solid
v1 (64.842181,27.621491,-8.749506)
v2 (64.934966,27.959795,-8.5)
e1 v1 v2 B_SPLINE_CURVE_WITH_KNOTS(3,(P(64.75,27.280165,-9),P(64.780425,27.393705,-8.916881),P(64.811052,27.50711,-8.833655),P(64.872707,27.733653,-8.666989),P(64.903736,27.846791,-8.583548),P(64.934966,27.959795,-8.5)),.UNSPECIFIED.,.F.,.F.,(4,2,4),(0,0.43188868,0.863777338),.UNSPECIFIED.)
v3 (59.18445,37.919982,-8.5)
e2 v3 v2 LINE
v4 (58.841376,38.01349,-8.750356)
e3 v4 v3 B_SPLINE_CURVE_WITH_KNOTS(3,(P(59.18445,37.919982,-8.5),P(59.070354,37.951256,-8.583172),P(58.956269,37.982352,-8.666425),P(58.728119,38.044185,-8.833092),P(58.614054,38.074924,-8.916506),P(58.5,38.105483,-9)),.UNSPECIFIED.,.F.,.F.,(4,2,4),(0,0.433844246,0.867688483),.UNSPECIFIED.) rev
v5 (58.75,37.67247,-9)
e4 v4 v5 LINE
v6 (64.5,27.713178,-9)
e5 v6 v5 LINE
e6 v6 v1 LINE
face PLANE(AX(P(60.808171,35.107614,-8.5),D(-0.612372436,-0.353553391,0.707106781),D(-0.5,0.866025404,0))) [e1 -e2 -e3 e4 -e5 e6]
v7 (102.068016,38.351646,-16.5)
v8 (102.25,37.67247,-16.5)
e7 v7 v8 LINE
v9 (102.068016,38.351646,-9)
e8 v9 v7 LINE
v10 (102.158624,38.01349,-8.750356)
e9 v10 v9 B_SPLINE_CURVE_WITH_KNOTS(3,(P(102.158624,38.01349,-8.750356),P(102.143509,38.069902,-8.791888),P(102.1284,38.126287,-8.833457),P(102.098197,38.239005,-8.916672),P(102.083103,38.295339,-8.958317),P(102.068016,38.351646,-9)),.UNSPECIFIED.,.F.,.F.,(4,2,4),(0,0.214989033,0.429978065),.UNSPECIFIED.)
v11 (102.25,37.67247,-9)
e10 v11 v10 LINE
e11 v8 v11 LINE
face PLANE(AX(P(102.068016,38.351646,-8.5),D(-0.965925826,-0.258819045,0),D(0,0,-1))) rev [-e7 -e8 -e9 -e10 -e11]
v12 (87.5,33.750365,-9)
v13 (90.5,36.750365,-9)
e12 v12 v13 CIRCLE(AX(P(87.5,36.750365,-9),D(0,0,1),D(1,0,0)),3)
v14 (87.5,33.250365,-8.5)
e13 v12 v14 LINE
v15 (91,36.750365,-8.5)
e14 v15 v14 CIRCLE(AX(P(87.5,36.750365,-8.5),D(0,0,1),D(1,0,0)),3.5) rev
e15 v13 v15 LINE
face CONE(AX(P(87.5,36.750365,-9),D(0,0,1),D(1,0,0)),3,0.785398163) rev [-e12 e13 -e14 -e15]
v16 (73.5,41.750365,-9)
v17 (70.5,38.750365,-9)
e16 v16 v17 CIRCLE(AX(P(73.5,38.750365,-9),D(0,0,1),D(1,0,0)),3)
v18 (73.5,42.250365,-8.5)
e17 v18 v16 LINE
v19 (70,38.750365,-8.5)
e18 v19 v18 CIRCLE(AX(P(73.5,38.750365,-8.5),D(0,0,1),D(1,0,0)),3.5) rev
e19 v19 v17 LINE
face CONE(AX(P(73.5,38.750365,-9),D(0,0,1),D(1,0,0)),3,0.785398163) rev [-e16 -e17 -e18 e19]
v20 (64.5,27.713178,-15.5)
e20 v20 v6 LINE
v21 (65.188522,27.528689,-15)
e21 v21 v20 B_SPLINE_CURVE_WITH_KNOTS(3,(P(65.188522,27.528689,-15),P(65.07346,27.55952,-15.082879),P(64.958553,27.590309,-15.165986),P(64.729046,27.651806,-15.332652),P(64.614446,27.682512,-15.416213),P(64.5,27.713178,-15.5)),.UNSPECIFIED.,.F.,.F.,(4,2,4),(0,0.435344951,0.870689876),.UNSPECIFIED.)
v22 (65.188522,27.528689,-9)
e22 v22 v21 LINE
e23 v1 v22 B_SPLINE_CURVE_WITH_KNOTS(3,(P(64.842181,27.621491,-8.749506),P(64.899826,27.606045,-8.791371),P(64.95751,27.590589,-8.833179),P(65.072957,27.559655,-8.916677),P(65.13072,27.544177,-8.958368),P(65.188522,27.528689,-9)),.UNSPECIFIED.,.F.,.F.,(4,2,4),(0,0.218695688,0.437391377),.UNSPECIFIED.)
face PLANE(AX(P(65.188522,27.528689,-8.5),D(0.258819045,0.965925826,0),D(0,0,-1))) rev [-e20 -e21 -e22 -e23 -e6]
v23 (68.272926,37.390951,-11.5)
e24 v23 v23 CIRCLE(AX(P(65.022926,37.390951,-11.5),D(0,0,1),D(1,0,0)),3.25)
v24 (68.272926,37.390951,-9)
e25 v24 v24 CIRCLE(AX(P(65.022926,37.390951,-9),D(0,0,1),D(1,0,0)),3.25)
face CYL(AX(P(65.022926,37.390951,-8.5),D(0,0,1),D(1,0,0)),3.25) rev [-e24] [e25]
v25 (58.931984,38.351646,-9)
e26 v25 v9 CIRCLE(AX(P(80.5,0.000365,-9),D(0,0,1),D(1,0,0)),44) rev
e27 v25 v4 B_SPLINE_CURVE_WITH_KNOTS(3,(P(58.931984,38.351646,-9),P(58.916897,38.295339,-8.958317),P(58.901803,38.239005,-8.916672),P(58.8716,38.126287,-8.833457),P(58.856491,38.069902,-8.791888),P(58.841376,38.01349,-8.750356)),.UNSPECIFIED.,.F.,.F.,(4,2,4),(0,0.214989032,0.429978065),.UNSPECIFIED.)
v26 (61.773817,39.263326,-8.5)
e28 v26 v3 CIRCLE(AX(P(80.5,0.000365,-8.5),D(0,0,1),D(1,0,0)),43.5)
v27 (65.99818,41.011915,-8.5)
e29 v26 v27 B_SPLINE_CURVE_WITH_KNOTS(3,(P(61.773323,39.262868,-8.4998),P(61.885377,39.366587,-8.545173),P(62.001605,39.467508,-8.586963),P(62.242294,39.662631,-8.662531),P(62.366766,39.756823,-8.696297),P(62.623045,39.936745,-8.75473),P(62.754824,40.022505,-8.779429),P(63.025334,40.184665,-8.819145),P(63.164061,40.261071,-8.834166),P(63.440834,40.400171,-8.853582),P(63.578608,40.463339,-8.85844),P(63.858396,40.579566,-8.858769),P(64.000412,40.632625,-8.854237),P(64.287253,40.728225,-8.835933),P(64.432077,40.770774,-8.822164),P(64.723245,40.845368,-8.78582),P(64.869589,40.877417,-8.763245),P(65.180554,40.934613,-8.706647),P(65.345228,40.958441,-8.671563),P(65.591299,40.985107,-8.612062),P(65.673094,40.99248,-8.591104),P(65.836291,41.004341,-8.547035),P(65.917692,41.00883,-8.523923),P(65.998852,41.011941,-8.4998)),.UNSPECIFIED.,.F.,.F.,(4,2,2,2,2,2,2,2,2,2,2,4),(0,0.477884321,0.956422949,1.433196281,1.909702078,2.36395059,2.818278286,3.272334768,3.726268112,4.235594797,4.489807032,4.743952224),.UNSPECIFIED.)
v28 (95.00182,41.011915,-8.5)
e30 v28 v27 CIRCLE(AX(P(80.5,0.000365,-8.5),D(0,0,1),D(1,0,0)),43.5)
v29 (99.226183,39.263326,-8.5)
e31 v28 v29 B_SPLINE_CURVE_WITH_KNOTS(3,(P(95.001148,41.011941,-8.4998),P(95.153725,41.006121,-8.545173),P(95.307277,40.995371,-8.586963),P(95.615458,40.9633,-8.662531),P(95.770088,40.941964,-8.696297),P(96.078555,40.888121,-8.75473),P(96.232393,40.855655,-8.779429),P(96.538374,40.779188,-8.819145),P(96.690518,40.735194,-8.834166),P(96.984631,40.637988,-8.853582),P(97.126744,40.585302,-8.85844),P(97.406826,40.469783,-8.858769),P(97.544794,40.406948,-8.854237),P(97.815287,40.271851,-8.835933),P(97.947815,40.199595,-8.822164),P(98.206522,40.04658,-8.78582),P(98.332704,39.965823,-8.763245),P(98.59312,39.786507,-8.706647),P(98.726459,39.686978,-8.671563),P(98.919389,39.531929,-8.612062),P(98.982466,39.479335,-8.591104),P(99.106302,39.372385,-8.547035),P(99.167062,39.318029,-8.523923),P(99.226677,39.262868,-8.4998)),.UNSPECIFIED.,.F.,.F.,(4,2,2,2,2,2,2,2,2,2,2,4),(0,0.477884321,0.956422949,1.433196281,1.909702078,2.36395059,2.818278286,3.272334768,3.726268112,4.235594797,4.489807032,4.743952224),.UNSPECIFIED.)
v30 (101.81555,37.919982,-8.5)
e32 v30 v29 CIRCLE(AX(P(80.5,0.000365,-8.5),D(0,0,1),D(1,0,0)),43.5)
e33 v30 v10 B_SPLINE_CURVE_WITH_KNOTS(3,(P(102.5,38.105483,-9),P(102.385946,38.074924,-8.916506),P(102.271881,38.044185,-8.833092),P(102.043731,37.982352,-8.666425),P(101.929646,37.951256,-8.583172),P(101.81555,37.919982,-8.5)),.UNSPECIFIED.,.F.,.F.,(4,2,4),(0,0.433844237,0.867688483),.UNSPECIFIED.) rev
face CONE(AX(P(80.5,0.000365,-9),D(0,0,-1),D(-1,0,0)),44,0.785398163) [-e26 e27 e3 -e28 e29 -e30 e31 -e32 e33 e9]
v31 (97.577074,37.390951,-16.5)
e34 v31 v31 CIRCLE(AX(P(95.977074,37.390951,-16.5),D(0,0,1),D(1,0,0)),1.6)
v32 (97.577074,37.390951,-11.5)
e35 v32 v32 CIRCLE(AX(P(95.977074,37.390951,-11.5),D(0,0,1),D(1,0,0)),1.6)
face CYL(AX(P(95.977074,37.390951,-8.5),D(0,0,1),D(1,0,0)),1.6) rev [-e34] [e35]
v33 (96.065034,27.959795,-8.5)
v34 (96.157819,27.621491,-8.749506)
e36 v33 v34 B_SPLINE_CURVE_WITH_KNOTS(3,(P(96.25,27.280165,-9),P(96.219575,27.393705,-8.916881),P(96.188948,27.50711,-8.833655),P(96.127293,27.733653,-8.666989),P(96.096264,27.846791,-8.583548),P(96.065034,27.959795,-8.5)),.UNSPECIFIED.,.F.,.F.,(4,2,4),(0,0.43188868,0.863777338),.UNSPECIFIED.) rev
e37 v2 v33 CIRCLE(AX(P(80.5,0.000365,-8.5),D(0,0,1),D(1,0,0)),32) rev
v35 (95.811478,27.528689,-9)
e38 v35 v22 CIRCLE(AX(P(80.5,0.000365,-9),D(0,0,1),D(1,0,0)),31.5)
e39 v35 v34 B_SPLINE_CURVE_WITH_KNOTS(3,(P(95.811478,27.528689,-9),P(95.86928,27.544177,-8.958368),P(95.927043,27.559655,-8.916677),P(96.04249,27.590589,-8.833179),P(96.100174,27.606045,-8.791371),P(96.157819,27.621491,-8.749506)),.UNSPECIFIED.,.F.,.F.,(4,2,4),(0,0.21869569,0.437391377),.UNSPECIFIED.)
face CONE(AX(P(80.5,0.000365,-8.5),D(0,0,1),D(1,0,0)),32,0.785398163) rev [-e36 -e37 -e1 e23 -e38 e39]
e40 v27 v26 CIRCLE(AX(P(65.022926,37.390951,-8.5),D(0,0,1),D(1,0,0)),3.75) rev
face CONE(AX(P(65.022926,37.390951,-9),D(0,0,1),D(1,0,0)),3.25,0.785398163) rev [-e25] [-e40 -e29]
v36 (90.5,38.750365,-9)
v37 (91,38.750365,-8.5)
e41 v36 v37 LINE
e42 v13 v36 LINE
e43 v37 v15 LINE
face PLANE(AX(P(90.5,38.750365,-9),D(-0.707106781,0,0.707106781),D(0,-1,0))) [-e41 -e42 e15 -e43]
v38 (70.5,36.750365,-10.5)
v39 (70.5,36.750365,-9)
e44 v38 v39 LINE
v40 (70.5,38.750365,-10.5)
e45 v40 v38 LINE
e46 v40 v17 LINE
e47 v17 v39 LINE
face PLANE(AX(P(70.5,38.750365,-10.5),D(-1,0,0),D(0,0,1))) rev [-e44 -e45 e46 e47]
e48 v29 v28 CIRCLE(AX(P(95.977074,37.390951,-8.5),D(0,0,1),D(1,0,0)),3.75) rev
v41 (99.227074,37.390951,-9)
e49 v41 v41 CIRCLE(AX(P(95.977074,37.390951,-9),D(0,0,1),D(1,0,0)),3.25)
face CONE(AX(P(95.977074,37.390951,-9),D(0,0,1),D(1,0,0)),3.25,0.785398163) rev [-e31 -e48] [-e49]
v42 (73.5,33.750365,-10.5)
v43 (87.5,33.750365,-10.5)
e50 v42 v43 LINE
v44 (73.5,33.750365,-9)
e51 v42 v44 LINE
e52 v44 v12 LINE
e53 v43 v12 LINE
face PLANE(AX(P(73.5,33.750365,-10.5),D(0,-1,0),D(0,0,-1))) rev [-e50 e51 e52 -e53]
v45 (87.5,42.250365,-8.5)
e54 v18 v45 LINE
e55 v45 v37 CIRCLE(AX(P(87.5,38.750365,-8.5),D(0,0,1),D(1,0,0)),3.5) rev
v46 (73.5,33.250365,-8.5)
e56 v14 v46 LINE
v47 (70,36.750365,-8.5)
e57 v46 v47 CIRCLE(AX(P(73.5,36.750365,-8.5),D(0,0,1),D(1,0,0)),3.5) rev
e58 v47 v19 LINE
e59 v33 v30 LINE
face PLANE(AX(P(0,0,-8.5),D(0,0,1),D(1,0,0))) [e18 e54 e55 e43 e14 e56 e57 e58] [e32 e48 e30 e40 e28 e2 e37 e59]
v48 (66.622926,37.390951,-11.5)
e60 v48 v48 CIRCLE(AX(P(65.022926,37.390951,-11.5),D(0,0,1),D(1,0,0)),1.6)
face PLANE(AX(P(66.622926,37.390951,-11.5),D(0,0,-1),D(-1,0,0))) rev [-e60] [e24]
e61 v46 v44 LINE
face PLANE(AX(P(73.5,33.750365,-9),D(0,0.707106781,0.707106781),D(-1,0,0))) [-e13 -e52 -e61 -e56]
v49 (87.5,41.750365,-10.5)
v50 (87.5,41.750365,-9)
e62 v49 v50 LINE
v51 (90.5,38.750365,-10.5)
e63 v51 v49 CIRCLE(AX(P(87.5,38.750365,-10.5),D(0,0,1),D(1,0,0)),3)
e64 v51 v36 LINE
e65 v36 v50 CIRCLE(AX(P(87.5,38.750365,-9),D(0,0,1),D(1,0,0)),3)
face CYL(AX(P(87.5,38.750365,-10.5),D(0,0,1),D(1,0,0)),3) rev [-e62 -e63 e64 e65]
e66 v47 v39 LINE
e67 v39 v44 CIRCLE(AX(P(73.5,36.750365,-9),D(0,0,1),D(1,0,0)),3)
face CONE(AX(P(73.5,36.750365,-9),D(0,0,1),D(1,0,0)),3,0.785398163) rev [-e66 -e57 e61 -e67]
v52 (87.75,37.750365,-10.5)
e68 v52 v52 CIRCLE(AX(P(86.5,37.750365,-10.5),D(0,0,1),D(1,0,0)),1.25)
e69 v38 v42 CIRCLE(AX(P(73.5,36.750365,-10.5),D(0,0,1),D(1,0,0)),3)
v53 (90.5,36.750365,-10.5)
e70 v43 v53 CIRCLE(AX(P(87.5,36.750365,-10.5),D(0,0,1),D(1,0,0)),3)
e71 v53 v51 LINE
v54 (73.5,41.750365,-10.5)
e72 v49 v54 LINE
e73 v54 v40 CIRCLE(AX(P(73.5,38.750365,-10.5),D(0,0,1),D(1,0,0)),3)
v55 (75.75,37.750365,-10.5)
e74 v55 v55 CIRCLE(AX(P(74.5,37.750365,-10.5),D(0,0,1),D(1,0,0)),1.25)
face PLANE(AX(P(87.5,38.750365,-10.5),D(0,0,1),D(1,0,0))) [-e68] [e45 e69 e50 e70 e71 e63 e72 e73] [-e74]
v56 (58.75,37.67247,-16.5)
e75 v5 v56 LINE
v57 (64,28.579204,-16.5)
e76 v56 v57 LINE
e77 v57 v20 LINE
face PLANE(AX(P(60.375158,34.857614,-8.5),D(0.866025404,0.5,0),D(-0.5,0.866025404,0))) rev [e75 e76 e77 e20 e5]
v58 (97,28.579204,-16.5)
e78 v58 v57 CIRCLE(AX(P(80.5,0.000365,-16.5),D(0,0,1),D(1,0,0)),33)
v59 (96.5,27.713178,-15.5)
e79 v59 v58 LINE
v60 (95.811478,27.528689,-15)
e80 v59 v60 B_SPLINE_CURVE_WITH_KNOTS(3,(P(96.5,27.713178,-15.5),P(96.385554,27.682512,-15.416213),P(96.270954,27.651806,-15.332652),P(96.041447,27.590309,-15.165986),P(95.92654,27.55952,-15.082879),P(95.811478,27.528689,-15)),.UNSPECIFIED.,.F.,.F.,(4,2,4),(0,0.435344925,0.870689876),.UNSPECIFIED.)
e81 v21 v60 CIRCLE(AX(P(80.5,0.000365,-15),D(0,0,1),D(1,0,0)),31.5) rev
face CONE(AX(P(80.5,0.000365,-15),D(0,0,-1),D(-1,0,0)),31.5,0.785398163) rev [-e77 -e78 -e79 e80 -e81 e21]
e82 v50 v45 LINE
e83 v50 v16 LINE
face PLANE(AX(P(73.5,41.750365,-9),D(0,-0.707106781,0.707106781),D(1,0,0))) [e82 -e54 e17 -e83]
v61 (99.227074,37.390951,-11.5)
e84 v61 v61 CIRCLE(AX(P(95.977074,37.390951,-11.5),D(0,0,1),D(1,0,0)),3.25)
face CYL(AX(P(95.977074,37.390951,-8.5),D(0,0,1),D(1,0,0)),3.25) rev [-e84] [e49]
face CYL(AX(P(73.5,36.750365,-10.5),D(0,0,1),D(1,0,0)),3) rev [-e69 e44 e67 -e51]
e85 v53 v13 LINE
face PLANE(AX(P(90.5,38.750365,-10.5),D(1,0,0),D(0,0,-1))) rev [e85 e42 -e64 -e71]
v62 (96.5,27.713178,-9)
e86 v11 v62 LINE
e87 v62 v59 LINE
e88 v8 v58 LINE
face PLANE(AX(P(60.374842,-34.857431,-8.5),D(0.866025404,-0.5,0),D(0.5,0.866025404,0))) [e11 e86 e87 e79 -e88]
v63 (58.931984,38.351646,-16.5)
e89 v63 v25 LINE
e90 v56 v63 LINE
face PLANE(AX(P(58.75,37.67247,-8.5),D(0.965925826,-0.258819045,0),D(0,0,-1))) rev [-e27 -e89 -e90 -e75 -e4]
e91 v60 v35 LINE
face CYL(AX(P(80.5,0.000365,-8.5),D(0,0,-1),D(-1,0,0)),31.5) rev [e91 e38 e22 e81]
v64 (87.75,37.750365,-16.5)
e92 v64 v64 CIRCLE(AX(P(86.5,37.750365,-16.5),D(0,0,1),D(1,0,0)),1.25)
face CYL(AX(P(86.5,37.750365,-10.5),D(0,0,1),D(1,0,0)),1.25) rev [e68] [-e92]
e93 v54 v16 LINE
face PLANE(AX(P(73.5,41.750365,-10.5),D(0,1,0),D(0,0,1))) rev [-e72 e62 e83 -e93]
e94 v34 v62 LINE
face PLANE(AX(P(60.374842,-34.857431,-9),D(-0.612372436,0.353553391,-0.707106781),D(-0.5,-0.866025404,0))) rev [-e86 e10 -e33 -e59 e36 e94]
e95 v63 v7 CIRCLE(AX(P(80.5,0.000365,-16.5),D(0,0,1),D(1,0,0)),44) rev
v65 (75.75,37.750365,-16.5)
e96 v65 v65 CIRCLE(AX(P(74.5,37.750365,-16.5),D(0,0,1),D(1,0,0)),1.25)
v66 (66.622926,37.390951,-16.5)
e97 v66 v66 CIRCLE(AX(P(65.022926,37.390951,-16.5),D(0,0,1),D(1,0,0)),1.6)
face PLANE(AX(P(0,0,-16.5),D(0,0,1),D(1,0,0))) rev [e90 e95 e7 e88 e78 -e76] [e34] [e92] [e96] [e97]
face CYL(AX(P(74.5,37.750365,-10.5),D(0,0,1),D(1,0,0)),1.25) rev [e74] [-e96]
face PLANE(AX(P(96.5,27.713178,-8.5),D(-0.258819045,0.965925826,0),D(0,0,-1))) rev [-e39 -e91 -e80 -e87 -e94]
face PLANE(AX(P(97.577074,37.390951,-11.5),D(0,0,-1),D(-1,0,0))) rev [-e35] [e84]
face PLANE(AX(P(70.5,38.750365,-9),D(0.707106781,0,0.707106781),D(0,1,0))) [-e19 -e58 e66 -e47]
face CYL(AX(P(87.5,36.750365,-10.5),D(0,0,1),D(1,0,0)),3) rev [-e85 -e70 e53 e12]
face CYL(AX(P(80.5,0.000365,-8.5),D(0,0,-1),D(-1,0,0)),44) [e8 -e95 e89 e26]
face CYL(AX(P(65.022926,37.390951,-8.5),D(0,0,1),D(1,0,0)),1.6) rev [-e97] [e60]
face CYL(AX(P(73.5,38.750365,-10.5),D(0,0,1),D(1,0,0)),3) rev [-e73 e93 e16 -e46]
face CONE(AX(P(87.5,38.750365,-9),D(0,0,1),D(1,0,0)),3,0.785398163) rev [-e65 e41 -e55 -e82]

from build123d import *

# Parameters (mm, degrees)
EXTRUDE_1_DEPTH              = 8
CHAMFER_7_SIZE               = 1.5
HOLE_WIZARD_M3_1_D           = 3.2
HOLE_WIZARD_M3_1_CBORE_D     = 6.5
HOLE_WIZARD_M3_1_CBORE_DEPTH = 3
CUT_EXTRUDE_6_DEPTH          = 2
CHAMFER_8_SIZE               = 0.5
CHAMFER_9_SIZE               = 0.5
M3X0_5_1_D                   = 2.5
M3X0_5_1_DEPTH               = 8.5
M3X0_5_1_TIP                 = 0.751075774


with BuildPart() as part:
    # ｽｹｯﾁ3 → ﾎﾞｽ - 押し出し1 (new body)
    with BuildSketch(Plane.XY.offset(-16.5)):
        with BuildLine():
            Line((58.49999999, 38.105482977), (64.74999999, 27.280165429))
            ThreePointArc((64.74999999, 27.280165429), (80.49999999, 31.50036521), (96.24999999, 27.280165429))
            Line((96.24999999, 27.280165429), (102.49999999, 38.105482977))
            ThreePointArc((102.49999999, 38.105482977), (80.49999999, 44.00036521), (58.49999999, 38.105482977))
        make_face()
    extrude(amount=EXTRUDE_1_DEPTH)

    # 面取り7
    chamfer_7_edges = [part.edges().sort_by_distance(p)[0] for p in [
        (80.49999999, 31.50036521, -16.5),
    ]]
    chamfer(chamfer_7_edges, length=CHAMFER_7_SIZE)

    # M3 穴付きねじ用座ぐり穴1 (through all)
    with Locations(Plane.XY.offset(-8.5)):
        with Locations((65.0229264, 37.390950693), (95.977073581, 37.390950693)):
            CounterBoreHole(HOLE_WIZARD_M3_1_D / 2, HOLE_WIZARD_M3_1_CBORE_D / 2, HOLE_WIZARD_M3_1_CBORE_DEPTH)

    # ｽｹｯﾁ17 → ｶｯﾄ - 押し出し6 (cut)
    with BuildSketch(Plane.XY.offset(-8.5)):
        with BuildLine():
            Line((73.49999999, 41.75036521), (87.49999999, 41.75036521))
            ThreePointArc((87.49999999, 41.75036521), (89.621320334, 40.871685554), (90.49999999, 38.75036521))
            Line((90.49999999, 38.75036521), (90.49999999, 36.75036521))
            ThreePointArc((90.49999999, 36.75036521), (89.621320334, 34.629044867), (87.49999999, 33.75036521))
            Line((87.49999999, 33.75036521), (73.49999999, 33.75036521))
            ThreePointArc((73.49999999, 33.75036521), (71.378679647, 34.629044867), (70.49999999, 36.75036521))
            Line((70.49999999, 36.75036521), (70.49999999, 38.75036521))
            ThreePointArc((70.49999999, 38.75036521), (71.378679647, 40.871685554), (73.49999999, 41.75036521))
        make_face()
    extrude(amount=-CUT_EXTRUDE_6_DEPTH, mode=Mode.SUBTRACT)

    # 面取り8
    # the kernel refuses this chamfer: 0.5 mm, written as the material it takes off along each edge
    with BuildSketch(Plane(origin=(80.49999999, 0.00036521, -8.5), x_dir=(-0.5349312949950591, 0.844895561377209, 0), z_dir=(-0.844895561377209, -0.5349312949950591, 0))) as chamfer_8_piece_1:
        Polygon((31.5, CHAMFER_8_SIZE), (31.5 + CHAMFER_8_SIZE, 0), (31.5, 0), align=None)
    revolve(axis=Axis((80.49999999, 0.00036521, -8.5), (0, 0, -1)), revolution_arc=64.678504259, mode=Mode.SUBTRACT)
    with BuildSketch(Plane(origin=(95.607079243, 26.16659403, -8.5), x_dir=(-0.8660254037844379, 0.5000000000000012, 0), z_dir=(0.5000000000000012, 0.866025403784438, 0))) as chamfer_8_piece_2:
        Polygon((CHAMFER_8_SIZE, 0), (0, -CHAMFER_8_SIZE), (0, 0), align=None)
    extrude(amount=15.071682988, mode=Mode.SUBTRACT)
    with BuildSketch(Plane(origin=(80.49999999, 0.00036521, -8.5), x_dir=(0.5250957878127545, 0.8510431326444641, 0), z_dir=(0.8510431326444641, -0.5250957878127545, 0))) as chamfer_8_piece_3:
        Polygon((44 - CHAMFER_8_SIZE, 0), (44, -CHAMFER_8_SIZE), (44, 0), align=None)
    revolve(axis=Axis((80.49999999, 0.00036521, -8.5), (0, 0, 1)), revolution_arc=63.349383731, mode=Mode.SUBTRACT)
    with BuildSketch(Plane(origin=(95.977073581, 37.390950693, -8.5), x_dir=(1, 0, 0), z_dir=(0, -1, 0))) as chamfer_8_piece_4:
        Polygon((3.25 + CHAMFER_8_SIZE, 0), (3.25, -CHAMFER_8_SIZE), (3.25, 0), align=None)
    revolve(axis=Axis((95.977073581, 37.390950693, -8.5), (0, 0, 1)), mode=Mode.SUBTRACT)
    with BuildSketch(Plane(origin=(65.0229264, 37.390950693, -8.5), x_dir=(1, 0, 0), z_dir=(0, -1, 0))) as chamfer_8_piece_5:
        Polygon((3.25 + CHAMFER_8_SIZE, 0), (3.25, -CHAMFER_8_SIZE), (3.25, 0), align=None)
    revolve(axis=Axis((65.0229264, 37.390950693, -8.5), (0, 0, 1)), mode=Mode.SUBTRACT)
    with BuildSketch(Plane(origin=(57.857079243, 39.219054376, -8.5), x_dir=(0, 0, -1), z_dir=(0.5000000000000007, -0.8660254037844384, 0))) as chamfer_8_piece_6:
        Polygon((CHAMFER_8_SIZE, 0), (0, CHAMFER_8_SIZE), (0, 0), align=None)
    extrude(amount=15.071682988, mode=Mode.SUBTRACT)
    with BuildSketch(Plane(origin=(87.49999999, 38.75036521, -8.5), x_dir=(0, 1, 0), z_dir=(-1, 0, 0))) as chamfer_8_piece_7:
        Polygon((3 + CHAMFER_8_SIZE, 0), (3, CHAMFER_8_SIZE), (3, 0), align=None)
    revolve(axis=Axis((87.49999999, 38.75036521, -8.5), (0, 0, -1)), revolution_arc=90, mode=Mode.SUBTRACT)
    with BuildSketch(Plane(origin=(73.49999999, 41.75036521, -8.5), x_dir=(0, 1, 0), z_dir=(1, 0, 0)), Plane(origin=(87.49999999, 33.75036521, -8.5), x_dir=(0, -1, 0), z_dir=(-1, 0, 0))) as chamfer_8_piece_8:
        Polygon((CHAMFER_8_SIZE, 0), (0, -CHAMFER_8_SIZE), (0, 0), align=None)
    extrude(amount=14, mode=Mode.SUBTRACT)
    with BuildSketch(Plane(origin=(73.49999999, 38.75036521, -8.5), x_dir=(-1, 0, 0), z_dir=(0, -1, 0))) as chamfer_8_piece_9:
        Polygon((3 + CHAMFER_8_SIZE, 0), (3, CHAMFER_8_SIZE), (3, 0), align=None)
    revolve(axis=Axis((73.49999999, 38.75036521, -8.5), (0, 0, -1)), revolution_arc=90, mode=Mode.SUBTRACT)
    with BuildSketch(Plane(origin=(70.49999999, 36.75036521, -8.5), x_dir=(-1, 0, 0), z_dir=(0, 1, 0)), Plane(origin=(90.49999999, 38.75036521, -8.5), x_dir=(1, 0, 0), z_dir=(0, -1, 0))) as chamfer_8_piece_10:
        Polygon((CHAMFER_8_SIZE, 0), (0, -CHAMFER_8_SIZE), (0, 0), align=None)
    extrude(amount=2, mode=Mode.SUBTRACT)
    with BuildSketch(Plane(origin=(73.49999999, 36.75036521, -8.5), x_dir=(0, -1, 0), z_dir=(1, 0, 0))) as chamfer_8_piece_11:
        Polygon((3 + CHAMFER_8_SIZE, 0), (3, CHAMFER_8_SIZE), (3, 0), align=None)
    revolve(axis=Axis((73.49999999, 36.75036521, -8.5), (0, 0, -1)), revolution_arc=90, mode=Mode.SUBTRACT)
    with BuildSketch(Plane(origin=(87.49999999, 36.75036521, -8.5), x_dir=(1, 0, 0), z_dir=(0, 1, 0))) as chamfer_8_piece_12:
        Polygon((3 + CHAMFER_8_SIZE, 0), (3, CHAMFER_8_SIZE), (3, 0), align=None)
    revolve(axis=Axis((87.49999999, 36.75036521, -8.5), (0, 0, -1)), revolution_arc=90, mode=Mode.SUBTRACT)

    # 面取り9
    # the kernel refuses this chamfer: 0.5 mm, written as the material it takes off along each edge
    with BuildSketch(Plane(origin=(96.24999999, 27.280165429, -16.296233904), x_dir=(-0.8699980733677616, 0.4930551209919465, 0), z_dir=(0, 0, 1))) as chamfer_9_piece_1:
        with BuildLine():
            Line((0.504048916, 0), (-CHAMFER_9_SIZE * 0.00800077643885, -CHAMFER_9_SIZE * 0.999967993276))
            Line((-CHAMFER_9_SIZE * 0.00800077643885, -CHAMFER_9_SIZE * 0.999967993276), (0, 0))
            ThreePointArc((0, 0), (0.259153689, -0.001007405), (0.504048916, 0))
        make_face()
    extrude(amount=8.592467809, mode=Mode.SUBTRACT)
    with BuildSketch(Plane(origin=(64.74999999, 27.280165429, -16.296233904), x_dir=(-0.499999999999999, 0.8660254037844393, 0), z_dir=(0, 0, 1))) as chamfer_9_piece_2:
        with BuildLine():
            Line((CHAMFER_9_SIZE, 0), (-0.004032783, -0.504032783))
            ThreePointArc((-0.004032783, -0.504032783), (-0.001066058, -0.259153454), (0, 0))
            Line((0, 0), (CHAMFER_9_SIZE, 0))
        make_face()
    extrude(amount=8.592467809, mode=Mode.SUBTRACT)
    with BuildSketch(Plane(origin=(58.49999999, 38.105482977, -17.785841494), x_dir=(0.5000000000000021, -0.8660254037844375, 0), z_dir=(0, 0, 1))) as chamfer_9_piece_3:
        with BuildLine():
            Line((CHAMFER_9_SIZE, 0), (0.002809166, 0.497190834))
            ThreePointArc((0.002809166, 0.497190834), (0.000742578, 0.255629249), (0, 0))
            Line((0, 0), (CHAMFER_9_SIZE, 0))
        make_face()
    extrude(amount=10.071682988, mode=Mode.SUBTRACT)
    with BuildSketch(Plane(origin=(102.49999999, 38.105482977, -17.785841494), x_dir=(-0.8688365739050292, 0.4950989879256175, 0), z_dir=(0, 0, 1))) as chamfer_9_piece_4:
        with BuildLine():
            Line((0.49719877, 0), (CHAMFER_9_SIZE * 0.00564998602096, CHAMFER_9_SIZE * 0.999984038702))
            Line((CHAMFER_9_SIZE * 0.00564998602096, CHAMFER_9_SIZE * 0.999984038702), (0, 0))
            ThreePointArc((0, 0), (0.255629364, -0.000701736), (0.49719877, 0))
        make_face()
    extrude(amount=10.071682988, mode=Mode.SUBTRACT)

    # M3x0.5 ねじ穴1
    with Locations(Plane.XY.offset(-10.5)):
        with Locations((74.49999999, 37.75036521), (86.49999999, 37.75036521)):
            Hole(M3X0_5_1_D / 2, depth=M3X0_5_1_DEPTH)
            with Locations((0, 0, -(M3X0_5_1_DEPTH + M3X0_5_1_TIP / 2))):  # 118° drill point
                Cone(0, M3X0_5_1_D / 2, M3X0_5_1_TIP, mode=Mode.SUBTRACT)


solid = part.part
